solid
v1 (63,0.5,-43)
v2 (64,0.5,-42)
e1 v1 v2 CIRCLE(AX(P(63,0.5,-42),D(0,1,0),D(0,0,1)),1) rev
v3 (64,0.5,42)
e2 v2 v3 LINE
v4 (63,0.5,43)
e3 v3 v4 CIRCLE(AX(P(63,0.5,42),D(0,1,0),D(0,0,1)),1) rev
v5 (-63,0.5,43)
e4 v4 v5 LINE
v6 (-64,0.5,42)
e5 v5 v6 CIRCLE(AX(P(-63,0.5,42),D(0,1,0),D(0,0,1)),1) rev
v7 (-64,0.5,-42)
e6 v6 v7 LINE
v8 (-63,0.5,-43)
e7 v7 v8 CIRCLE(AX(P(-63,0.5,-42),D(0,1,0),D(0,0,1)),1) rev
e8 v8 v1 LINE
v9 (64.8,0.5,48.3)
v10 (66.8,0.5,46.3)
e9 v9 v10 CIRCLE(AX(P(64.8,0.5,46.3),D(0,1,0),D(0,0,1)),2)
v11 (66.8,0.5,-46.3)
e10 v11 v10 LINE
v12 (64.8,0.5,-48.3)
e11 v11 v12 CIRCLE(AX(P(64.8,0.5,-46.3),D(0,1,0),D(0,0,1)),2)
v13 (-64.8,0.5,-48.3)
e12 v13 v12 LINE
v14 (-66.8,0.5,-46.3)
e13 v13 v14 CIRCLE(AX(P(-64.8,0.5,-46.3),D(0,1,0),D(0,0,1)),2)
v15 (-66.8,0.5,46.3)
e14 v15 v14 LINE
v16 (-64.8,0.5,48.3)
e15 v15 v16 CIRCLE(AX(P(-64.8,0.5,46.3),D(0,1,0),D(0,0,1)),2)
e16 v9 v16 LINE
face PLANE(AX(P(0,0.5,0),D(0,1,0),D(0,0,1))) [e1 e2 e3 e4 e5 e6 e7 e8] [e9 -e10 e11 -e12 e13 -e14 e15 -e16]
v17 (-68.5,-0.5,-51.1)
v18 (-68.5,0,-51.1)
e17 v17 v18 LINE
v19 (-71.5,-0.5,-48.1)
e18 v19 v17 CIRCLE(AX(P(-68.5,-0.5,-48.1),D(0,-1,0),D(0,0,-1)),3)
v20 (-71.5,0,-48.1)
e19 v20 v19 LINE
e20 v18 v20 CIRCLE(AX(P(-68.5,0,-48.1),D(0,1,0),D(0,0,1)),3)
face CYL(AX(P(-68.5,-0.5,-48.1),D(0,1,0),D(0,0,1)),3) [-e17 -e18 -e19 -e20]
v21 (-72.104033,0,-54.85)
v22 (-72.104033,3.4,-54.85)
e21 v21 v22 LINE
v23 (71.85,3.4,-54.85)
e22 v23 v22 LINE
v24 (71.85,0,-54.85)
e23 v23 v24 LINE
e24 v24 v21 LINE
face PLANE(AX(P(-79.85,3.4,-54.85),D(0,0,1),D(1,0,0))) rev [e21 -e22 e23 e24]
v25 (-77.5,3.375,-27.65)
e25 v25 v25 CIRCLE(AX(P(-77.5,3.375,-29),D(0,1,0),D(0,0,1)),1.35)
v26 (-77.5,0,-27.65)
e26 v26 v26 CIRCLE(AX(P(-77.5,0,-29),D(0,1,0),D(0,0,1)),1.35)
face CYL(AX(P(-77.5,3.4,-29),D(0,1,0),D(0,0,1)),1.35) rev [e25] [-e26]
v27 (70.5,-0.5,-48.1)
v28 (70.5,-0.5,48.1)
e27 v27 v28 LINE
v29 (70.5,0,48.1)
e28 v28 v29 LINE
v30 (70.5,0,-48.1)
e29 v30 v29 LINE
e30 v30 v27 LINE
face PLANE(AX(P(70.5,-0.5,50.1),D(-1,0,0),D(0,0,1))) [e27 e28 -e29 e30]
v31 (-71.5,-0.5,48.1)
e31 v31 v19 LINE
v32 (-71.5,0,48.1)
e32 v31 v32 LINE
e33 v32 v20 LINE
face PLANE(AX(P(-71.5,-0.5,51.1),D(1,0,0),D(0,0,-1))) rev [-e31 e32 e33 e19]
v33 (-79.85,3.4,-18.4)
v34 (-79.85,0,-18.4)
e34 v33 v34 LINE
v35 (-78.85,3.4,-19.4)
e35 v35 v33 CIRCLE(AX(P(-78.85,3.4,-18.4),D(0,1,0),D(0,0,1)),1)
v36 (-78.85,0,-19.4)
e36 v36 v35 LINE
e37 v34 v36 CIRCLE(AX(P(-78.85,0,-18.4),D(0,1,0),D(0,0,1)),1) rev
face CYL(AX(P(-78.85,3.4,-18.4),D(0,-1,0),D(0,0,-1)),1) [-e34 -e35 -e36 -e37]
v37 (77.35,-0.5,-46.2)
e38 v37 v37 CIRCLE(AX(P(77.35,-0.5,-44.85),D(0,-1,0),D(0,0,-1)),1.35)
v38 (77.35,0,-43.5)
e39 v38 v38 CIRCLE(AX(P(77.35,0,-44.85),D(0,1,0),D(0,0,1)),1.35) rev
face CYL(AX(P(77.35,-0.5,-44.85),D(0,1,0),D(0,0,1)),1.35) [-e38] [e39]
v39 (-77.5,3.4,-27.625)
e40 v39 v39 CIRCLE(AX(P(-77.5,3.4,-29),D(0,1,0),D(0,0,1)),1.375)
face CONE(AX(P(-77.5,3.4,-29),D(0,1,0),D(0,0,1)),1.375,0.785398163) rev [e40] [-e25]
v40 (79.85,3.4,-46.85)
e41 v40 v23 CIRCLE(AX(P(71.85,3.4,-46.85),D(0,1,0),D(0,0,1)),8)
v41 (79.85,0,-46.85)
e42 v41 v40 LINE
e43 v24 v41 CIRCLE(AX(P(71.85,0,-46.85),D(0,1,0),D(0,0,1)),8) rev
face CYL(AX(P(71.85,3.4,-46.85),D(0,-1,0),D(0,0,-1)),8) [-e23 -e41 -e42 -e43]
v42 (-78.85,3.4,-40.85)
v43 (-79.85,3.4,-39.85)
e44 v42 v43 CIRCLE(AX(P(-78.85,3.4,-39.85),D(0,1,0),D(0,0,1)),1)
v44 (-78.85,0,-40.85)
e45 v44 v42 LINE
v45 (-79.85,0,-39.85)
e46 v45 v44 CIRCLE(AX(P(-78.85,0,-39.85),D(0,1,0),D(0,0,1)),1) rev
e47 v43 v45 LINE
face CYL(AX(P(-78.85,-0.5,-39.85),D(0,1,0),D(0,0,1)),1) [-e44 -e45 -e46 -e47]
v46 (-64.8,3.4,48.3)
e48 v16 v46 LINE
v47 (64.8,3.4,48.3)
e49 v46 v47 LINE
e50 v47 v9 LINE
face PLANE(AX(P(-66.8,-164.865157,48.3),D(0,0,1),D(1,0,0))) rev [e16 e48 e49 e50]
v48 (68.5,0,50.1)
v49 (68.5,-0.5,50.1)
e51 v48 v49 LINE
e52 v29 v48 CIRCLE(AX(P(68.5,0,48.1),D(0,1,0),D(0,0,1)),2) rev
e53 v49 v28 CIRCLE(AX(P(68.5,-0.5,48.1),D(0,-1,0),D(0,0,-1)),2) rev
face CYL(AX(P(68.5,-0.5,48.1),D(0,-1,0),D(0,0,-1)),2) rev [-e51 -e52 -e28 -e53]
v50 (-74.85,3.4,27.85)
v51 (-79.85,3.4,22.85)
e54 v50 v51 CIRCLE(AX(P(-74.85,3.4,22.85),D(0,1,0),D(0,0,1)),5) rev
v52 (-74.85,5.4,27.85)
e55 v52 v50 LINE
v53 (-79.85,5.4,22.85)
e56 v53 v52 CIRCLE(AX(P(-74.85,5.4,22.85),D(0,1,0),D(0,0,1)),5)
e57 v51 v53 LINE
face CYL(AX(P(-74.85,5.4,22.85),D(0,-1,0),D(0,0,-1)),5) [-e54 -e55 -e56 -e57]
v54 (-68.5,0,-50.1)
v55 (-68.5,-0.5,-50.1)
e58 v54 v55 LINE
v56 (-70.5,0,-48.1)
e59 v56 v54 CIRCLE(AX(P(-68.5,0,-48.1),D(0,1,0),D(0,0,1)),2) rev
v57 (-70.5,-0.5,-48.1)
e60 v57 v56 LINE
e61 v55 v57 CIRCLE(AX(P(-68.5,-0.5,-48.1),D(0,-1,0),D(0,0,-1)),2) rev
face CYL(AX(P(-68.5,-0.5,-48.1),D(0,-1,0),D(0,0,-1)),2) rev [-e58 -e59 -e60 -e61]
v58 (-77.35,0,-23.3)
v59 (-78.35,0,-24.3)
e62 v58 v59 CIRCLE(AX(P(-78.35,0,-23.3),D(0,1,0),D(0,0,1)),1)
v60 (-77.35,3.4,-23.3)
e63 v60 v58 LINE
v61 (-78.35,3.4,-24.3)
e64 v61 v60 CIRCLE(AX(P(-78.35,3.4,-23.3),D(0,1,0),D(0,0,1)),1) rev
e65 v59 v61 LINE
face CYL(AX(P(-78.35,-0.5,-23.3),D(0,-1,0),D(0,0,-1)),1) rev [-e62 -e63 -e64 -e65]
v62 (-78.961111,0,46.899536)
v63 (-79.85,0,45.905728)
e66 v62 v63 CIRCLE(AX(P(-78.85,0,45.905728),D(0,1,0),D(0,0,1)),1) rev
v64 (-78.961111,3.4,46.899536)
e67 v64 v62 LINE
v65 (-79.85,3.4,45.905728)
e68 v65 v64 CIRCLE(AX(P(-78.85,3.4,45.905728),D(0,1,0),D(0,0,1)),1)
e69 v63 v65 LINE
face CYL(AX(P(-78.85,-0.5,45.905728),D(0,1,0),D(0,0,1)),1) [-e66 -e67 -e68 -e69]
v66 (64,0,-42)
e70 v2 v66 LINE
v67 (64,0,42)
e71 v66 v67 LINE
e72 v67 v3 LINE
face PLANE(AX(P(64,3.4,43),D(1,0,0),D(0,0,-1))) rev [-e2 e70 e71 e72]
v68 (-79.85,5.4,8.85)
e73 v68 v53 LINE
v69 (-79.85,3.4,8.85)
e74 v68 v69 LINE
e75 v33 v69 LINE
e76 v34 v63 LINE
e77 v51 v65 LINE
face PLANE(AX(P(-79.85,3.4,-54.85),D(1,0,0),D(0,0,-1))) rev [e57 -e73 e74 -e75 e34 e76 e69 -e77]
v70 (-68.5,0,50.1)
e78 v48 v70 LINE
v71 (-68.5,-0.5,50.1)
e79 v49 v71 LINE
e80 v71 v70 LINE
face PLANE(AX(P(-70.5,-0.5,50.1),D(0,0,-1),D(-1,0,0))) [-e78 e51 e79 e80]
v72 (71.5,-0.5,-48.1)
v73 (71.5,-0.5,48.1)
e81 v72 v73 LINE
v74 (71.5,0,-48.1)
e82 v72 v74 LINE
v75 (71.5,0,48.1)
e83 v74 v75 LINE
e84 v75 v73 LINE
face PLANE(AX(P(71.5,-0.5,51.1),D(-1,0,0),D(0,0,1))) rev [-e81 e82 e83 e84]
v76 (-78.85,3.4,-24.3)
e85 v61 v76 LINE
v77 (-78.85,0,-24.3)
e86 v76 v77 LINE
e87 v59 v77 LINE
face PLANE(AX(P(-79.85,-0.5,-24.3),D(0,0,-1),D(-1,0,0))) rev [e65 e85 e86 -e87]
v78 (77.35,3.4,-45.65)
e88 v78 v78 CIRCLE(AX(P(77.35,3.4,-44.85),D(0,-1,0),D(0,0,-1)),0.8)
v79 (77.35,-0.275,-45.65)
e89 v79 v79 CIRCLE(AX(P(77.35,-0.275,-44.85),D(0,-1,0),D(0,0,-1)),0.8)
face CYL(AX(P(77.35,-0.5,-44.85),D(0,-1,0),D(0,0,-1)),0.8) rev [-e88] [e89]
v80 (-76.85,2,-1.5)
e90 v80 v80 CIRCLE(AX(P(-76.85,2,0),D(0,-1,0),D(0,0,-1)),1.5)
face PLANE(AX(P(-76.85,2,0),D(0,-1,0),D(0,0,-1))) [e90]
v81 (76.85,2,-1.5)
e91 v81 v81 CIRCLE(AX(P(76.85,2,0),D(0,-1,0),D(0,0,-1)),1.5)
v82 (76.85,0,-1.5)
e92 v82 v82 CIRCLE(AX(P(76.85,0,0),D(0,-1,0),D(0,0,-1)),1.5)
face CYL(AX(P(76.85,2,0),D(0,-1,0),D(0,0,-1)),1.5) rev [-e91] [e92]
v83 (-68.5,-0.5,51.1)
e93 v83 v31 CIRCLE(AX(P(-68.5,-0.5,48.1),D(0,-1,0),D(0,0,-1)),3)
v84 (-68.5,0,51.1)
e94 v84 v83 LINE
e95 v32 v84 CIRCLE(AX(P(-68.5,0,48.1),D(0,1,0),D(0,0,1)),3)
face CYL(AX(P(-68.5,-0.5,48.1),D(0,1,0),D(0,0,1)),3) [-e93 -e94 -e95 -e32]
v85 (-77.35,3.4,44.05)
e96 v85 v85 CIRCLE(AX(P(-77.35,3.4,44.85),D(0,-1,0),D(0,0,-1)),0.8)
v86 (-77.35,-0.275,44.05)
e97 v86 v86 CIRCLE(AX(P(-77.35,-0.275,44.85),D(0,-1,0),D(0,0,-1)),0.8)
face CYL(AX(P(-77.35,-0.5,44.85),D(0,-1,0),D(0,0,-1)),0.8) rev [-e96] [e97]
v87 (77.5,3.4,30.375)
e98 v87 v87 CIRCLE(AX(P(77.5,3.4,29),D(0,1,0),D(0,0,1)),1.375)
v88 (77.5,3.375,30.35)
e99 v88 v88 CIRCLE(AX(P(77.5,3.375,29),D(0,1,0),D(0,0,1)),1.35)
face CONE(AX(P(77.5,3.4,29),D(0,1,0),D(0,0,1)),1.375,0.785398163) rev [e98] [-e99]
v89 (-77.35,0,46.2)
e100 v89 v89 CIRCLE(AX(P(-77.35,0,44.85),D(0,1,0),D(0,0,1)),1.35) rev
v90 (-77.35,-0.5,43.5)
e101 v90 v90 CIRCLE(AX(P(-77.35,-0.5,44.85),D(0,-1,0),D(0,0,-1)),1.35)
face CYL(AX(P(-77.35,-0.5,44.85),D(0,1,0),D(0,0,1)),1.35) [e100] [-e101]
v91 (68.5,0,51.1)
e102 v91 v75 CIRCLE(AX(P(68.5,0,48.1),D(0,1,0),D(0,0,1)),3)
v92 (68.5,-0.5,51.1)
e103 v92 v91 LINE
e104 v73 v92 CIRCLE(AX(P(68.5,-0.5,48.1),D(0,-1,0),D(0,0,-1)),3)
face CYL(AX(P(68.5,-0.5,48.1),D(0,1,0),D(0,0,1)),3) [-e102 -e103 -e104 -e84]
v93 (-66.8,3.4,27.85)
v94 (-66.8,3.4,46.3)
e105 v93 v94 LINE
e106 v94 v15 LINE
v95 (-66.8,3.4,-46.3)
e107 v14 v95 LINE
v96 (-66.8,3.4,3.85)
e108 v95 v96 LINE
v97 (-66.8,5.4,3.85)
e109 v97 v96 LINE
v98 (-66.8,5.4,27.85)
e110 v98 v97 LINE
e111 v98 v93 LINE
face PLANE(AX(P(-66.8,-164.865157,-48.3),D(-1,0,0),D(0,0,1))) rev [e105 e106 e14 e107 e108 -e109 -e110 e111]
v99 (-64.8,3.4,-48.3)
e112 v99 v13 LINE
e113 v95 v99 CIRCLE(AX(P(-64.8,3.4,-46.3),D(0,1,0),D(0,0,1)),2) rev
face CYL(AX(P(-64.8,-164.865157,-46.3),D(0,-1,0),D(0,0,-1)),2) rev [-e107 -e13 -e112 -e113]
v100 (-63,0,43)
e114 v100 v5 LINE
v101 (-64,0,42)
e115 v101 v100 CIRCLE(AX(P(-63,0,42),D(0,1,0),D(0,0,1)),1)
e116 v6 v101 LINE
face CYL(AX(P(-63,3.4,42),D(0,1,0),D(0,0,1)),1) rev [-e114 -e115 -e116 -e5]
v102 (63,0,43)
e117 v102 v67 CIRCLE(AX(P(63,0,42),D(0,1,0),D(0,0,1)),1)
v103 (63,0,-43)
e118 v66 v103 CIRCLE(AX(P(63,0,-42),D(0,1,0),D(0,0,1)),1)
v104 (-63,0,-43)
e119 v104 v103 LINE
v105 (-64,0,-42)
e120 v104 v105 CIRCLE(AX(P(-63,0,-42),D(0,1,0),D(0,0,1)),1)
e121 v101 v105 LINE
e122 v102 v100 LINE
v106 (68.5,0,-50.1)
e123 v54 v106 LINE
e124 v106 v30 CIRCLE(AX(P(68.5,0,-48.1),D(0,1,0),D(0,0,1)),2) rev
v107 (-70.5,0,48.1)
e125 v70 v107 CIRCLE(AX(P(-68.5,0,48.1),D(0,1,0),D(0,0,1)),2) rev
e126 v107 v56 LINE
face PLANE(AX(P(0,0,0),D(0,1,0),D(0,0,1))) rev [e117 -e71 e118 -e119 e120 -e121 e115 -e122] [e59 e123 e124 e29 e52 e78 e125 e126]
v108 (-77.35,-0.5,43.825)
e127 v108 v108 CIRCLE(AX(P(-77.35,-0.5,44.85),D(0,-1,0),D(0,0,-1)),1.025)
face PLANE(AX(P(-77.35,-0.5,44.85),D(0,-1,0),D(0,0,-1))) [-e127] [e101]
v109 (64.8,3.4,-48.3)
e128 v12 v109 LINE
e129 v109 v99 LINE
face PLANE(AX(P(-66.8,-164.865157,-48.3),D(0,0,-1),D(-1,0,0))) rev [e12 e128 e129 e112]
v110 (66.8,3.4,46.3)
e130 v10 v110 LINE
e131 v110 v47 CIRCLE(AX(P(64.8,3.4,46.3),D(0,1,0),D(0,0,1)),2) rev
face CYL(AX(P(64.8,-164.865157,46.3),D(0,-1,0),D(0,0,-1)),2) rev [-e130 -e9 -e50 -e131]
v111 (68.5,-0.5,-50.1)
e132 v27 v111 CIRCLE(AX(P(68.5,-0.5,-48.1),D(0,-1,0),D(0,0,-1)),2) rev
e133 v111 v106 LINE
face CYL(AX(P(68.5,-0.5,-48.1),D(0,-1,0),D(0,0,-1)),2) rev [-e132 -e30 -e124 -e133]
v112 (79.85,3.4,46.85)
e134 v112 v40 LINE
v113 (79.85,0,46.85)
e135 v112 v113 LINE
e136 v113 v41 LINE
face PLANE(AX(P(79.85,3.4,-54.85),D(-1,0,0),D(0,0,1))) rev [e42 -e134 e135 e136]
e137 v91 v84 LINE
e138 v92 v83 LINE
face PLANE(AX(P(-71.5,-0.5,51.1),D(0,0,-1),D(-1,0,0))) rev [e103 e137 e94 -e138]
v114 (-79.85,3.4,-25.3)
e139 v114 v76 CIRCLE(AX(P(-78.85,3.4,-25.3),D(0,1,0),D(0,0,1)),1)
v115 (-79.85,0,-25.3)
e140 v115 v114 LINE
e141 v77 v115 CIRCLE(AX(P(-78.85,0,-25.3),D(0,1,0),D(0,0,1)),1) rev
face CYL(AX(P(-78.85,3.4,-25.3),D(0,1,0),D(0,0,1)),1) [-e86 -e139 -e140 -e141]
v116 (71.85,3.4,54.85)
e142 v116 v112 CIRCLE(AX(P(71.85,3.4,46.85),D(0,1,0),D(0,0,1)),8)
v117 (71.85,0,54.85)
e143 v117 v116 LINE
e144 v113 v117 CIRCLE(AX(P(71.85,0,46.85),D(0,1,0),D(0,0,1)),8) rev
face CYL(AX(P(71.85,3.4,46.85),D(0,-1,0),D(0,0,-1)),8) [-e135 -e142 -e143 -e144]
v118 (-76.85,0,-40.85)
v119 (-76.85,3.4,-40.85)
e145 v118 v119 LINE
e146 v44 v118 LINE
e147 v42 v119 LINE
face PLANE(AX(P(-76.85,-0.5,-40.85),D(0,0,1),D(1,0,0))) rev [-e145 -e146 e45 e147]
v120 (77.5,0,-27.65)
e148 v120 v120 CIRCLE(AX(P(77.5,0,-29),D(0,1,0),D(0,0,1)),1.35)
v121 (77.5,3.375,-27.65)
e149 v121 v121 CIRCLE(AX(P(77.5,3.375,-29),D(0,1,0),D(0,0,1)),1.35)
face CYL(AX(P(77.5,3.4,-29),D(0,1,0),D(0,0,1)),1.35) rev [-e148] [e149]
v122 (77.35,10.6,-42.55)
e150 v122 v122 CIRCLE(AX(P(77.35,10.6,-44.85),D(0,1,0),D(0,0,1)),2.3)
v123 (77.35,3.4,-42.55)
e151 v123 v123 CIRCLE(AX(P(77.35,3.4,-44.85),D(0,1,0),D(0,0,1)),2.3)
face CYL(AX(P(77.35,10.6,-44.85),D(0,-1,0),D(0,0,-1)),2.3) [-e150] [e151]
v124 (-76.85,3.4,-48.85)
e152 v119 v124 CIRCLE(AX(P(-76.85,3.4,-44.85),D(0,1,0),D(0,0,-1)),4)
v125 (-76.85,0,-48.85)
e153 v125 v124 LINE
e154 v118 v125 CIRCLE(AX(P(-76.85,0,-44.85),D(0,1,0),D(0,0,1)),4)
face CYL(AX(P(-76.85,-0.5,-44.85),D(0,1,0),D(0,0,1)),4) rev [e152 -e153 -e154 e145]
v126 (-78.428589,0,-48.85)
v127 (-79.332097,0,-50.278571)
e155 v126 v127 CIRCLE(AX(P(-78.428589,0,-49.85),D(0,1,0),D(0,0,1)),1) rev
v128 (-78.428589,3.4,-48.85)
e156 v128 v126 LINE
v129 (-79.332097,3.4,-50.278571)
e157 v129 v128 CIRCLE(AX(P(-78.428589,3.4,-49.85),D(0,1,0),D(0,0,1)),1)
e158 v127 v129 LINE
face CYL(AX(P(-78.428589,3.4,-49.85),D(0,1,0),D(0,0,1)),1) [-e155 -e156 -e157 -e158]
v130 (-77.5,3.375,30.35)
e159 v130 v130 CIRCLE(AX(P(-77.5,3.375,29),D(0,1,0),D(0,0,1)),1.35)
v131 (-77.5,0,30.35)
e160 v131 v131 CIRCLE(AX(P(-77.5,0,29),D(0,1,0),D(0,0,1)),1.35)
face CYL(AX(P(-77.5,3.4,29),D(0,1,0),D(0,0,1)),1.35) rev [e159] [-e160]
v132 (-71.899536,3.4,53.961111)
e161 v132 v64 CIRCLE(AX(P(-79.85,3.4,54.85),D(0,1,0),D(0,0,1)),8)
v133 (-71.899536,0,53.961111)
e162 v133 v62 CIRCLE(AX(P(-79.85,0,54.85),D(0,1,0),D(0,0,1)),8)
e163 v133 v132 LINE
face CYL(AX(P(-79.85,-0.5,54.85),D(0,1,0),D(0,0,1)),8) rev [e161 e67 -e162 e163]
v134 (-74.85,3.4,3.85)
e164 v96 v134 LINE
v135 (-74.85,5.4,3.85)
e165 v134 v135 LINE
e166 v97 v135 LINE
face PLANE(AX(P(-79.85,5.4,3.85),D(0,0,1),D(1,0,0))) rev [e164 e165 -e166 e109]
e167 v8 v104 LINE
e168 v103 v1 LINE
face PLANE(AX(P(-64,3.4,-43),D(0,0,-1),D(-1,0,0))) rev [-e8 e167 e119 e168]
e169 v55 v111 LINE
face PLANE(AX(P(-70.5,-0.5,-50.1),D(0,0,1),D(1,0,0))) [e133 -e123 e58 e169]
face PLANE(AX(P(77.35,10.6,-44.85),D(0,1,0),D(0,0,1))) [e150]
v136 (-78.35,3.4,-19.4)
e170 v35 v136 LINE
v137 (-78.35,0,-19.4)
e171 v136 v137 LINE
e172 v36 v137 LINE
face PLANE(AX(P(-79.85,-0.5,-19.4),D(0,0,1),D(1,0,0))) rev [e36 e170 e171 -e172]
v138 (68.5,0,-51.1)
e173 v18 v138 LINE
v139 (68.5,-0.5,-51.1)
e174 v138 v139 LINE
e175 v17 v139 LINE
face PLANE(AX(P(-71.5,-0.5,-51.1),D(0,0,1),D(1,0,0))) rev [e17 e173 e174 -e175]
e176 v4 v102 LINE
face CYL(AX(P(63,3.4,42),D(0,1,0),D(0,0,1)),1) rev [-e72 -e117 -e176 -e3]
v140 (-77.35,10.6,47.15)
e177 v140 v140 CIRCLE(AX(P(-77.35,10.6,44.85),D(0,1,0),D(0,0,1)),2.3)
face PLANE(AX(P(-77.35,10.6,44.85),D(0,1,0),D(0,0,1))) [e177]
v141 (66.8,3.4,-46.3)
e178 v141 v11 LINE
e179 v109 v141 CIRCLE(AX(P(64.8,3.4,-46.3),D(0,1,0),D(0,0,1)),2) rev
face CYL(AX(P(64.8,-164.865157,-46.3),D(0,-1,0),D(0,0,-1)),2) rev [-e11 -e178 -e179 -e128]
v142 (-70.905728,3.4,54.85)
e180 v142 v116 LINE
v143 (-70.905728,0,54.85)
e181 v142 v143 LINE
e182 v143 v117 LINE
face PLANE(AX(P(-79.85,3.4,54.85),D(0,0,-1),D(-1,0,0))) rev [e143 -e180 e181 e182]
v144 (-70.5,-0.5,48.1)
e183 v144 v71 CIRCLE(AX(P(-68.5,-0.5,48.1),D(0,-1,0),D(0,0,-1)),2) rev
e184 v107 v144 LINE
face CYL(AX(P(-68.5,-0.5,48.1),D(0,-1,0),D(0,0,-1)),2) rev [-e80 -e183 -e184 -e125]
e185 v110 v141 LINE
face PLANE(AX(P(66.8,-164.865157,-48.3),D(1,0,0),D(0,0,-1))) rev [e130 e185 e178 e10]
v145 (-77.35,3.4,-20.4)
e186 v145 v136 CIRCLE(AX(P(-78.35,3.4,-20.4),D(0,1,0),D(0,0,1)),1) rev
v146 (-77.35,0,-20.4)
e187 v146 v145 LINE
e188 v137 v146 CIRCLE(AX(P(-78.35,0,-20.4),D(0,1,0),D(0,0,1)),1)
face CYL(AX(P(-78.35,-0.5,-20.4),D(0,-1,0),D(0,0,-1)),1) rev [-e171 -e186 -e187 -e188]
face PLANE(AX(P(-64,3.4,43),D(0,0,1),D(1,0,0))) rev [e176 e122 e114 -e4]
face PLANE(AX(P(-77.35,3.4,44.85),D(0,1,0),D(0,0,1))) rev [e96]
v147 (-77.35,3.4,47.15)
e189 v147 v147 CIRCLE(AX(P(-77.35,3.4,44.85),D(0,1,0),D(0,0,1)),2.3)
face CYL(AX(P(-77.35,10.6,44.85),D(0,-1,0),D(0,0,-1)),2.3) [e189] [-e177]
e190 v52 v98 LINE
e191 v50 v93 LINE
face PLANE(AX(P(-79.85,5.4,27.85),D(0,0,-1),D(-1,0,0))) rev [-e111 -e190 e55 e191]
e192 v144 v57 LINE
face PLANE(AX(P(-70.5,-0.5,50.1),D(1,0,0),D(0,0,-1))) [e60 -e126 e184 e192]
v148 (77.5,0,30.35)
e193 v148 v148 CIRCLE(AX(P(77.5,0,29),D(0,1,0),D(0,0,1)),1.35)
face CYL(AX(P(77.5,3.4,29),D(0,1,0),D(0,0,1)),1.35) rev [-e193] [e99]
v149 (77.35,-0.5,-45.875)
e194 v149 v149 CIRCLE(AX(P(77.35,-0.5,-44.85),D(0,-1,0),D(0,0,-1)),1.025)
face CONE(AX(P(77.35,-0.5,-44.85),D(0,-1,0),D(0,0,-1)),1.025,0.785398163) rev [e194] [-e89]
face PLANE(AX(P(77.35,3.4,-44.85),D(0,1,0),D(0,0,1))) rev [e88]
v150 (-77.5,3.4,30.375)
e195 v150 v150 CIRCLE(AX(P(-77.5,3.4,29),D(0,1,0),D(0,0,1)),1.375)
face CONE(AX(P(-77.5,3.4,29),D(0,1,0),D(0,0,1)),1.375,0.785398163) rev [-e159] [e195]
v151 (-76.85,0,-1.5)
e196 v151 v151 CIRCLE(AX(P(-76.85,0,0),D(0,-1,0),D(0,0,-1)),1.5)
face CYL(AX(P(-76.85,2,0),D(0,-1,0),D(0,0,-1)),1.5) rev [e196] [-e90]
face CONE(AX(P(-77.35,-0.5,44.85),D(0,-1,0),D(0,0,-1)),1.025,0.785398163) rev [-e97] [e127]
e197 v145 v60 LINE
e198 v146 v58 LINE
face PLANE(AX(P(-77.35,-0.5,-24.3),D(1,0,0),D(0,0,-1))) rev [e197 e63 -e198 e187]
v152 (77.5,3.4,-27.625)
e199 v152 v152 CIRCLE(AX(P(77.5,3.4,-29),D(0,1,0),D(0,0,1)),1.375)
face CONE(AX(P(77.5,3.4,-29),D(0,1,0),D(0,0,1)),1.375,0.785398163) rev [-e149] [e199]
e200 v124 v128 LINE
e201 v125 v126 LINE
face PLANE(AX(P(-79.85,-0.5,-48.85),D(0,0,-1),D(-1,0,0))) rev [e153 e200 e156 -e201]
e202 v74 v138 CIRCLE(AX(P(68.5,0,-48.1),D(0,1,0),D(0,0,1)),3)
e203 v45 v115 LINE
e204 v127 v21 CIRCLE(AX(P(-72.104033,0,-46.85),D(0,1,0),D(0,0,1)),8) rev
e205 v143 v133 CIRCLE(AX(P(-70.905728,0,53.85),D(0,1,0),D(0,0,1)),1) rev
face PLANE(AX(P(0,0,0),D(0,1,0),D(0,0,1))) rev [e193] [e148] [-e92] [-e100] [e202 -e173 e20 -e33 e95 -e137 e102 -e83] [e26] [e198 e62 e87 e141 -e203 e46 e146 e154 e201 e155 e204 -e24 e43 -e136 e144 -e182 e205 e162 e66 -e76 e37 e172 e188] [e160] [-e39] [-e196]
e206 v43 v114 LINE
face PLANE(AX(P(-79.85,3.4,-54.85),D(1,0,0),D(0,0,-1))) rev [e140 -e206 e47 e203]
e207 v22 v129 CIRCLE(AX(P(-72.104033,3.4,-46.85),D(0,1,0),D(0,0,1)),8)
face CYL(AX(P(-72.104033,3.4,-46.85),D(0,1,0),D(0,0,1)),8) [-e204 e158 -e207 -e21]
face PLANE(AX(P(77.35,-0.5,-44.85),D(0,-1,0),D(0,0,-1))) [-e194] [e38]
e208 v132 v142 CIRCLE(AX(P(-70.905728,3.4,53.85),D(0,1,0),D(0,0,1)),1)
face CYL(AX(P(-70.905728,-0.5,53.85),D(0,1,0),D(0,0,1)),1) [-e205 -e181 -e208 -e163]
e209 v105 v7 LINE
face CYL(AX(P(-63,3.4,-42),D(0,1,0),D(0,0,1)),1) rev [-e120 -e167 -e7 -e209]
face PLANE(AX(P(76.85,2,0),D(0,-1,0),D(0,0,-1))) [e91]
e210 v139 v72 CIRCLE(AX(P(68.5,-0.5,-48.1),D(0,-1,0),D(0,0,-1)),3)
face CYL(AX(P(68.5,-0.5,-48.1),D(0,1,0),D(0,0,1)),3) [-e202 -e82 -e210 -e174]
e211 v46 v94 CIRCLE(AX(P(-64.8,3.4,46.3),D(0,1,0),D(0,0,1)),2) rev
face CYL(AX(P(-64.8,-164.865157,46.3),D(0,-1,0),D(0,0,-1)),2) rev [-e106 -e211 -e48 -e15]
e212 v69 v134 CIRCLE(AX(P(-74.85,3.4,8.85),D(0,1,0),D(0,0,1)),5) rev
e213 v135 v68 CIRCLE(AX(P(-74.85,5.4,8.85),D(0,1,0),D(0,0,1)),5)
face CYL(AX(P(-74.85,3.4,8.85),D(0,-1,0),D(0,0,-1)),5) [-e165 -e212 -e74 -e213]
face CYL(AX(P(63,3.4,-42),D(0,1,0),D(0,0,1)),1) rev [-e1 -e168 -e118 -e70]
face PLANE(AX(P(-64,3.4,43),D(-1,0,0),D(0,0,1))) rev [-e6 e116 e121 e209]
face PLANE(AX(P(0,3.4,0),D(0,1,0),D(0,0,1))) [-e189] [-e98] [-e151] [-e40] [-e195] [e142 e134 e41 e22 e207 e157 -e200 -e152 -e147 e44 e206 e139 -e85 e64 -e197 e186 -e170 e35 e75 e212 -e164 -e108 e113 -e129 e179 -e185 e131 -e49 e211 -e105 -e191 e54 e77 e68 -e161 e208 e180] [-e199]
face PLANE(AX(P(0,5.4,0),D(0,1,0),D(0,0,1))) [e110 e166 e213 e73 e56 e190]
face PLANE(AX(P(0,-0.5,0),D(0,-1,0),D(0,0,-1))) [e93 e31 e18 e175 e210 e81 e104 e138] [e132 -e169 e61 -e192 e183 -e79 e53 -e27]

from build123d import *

# Parameters (mm, degrees)
SKETCH1_W                            = 159.7
SKETCH1_H                            = 109.7
BOSS_EXTRUDE1_DEPTH                  = 3.4
SKETCH5_W                            = 128
SKETCH5_H                            = 86
CUT_EXTRUDE1_DEPTH                   = 97.933508138
SKETCH6_W                            = 133.6
SKETCH6_H                            = 96.6
CUT_EXTRUDE2_DEPTH                   = 2.9
F_2_7_2_7_DIAMETER_HOLE1_D           = 2.7
F_2_7_2_7_DIAMETER_HOLE1_CSINK_D     = 2.75
F_2_7_2_7_DIAMETER_HOLE1_CSINK_ANGLE = 90
SKETCH10_R                           = 1.35
BOSS_EXTRUDE3_DEPTH                  = 0.5
M2X0_4_TAPPED_HOLE1_D                = 1.6
M2X0_4_TAPPED_HOLE1_CSINK_D          = 2.05
M2X0_4_TAPPED_HOLE1_CSINK_ANGLE      = 90
SKETCH7_W                            = 143
SKETCH7_H                            = 102.2
SKETCH7_W_2                          = 141
SKETCH7_H_2                          = 100.2
BOSS_EXTRUDE2_DEPTH                  = 0.5
SKETCH17_R                           = 1.5
CUT_EXTRUDE6_DEPTH                   = 2
SKETCH15_W                           = 2.5
SKETCH15_H                           = 4.9
CUT_EXTRUDE5_DEPTH                   = 97.952333649
CUT_EXTRUDE4_DEPTH                   = 97.952333649
SKETCH8_R                            = 8
CUT_EXTRUDE3_DEPTH                   = 97.952333649
SKETCH14_R                           = 2.3
BOSS_EXTRUDE4_DEPTH                  = 7.2
FILLET1_R                            = 8
FILLET2_R                            = 2
FILLET3_R                            = 3
FILLET4_R                            = 1
FILLET5_R                            = 2
FILLET6_R                            = 1
SKETCH16_W                           = 13.05
SKETCH16_H                           = 24
BOSS_EXTRUDE5_DEPTH                  = 2
FILLET7_R                            = 5


with BuildPart() as part:
    # Sketch1 → Boss-Extrude1 (new body)
    with BuildSketch(Plane(origin=(0, 0, 0), x_dir=(1, 0, 0), z_dir=(0, 1, 0))):
        Rectangle(SKETCH1_W, SKETCH1_H)
    extrude(amount=BOSS_EXTRUDE1_DEPTH)

    # Sketch5 → Cut-Extrude1 (cut, through all)
    with BuildSketch(Plane.XZ):
        Rectangle(SKETCH5_W, SKETCH5_H)
    extrude(amount=-CUT_EXTRUDE1_DEPTH, mode=Mode.SUBTRACT)

    # Sketch6 → Cut-Extrude2 (cut)
    with BuildSketch(Plane(origin=(0, 3.4, 0), x_dir=(1, 0, 0), z_dir=(0, 1, 0))):
        Rectangle(SKETCH6_W, SKETCH6_H)
    extrude(amount=-CUT_EXTRUDE2_DEPTH, mode=Mode.SUBTRACT)

    # Ø2.7 (2.7) Diameter Hole1 (through all)
    with Locations(Plane(origin=(0, 3.4, 0), x_dir=(1, 0, 0), z_dir=(0, 1, 0))):
        with Locations((-77.5, 29), (-77.5, -29), (77.5, 29), (77.5, -29)):
            CounterSinkHole(F_2_7_2_7_DIAMETER_HOLE1_D / 2, F_2_7_2_7_DIAMETER_HOLE1_CSINK_D / 2, counter_sink_angle=F_2_7_2_7_DIAMETER_HOLE1_CSINK_ANGLE)

    # Sketch10 → Boss-Extrude3 (add)
    with BuildSketch(Plane.XZ):
        with Locations(Location((-77.35, 44.85, 0), (0, 0, 90))):
            Circle(SKETCH10_R)
        with Locations(Location((77.35, -44.85, 0), (0, 0, 90))):
            Circle(SKETCH10_R)
    extrude(amount=BOSS_EXTRUDE3_DEPTH)

    # M2x0.4 Tapped Hole1 (through all)
    with Locations(Plane(origin=(0, -0.5, 0), x_dir=(-1, 0, 0), z_dir=(0, -1, 0))):
        with Locations((-77.35, 44.85), (77.35, -44.85)):
            CounterSinkHole(M2X0_4_TAPPED_HOLE1_D / 2, M2X0_4_TAPPED_HOLE1_CSINK_D / 2, counter_sink_angle=M2X0_4_TAPPED_HOLE1_CSINK_ANGLE)

    # Sketch7 → Boss-Extrude2 (add)
    with BuildSketch(Plane.XZ):
        Rectangle(SKETCH7_W, SKETCH7_H)
        Rectangle(SKETCH7_W_2, SKETCH7_H_2, mode=Mode.SUBTRACT)
    extrude(amount=BOSS_EXTRUDE2_DEPTH)

    # Sketch17 → Cut-Extrude6 (cut)
    with BuildSketch(Plane.XZ):
        with Locations(Location((-76.85, 0, 0), (0, 0, 270))):
            Circle(SKETCH17_R)
        with Locations(Location((76.85, 0, 0), (0, 0, 270))):
            Circle(SKETCH17_R)
    extrude(amount=-CUT_EXTRUDE6_DEPTH, mode=Mode.SUBTRACT)

    # Sketch15 → Cut-Extrude5 (cut, through all)
    with BuildSketch(Plane(origin=(0, 3.4, 0), x_dir=(1, 0, 0), z_dir=(0, 1, 0))):
        with Locations((-78.6, 21.85)):
            Rectangle(SKETCH15_W, SKETCH15_H)
    extrude(amount=-CUT_EXTRUDE5_DEPTH, mode=Mode.SUBTRACT)

    # Sketch9 → Cut-Extrude4 (cut, through all)
    with BuildSketch(Plane(origin=(0, 3.4, 0), x_dir=(1, 0, 0), z_dir=(0, 1, 0))):
        with BuildLine():
            Line((-76.85, 40.85), (-79.85, 40.85))
            Line((-79.85, 40.85), (-79.85, 48.85))
            Line((-79.85, 48.85), (-76.85, 48.85))
            ThreePointArc((-76.85, 48.85), (-72.85, 44.85), (-76.85, 40.85))
        make_face()
    extrude(amount=-CUT_EXTRUDE4_DEPTH, mode=Mode.SUBTRACT)

    # Sketch8 → Cut-Extrude3 (cut, through all)
    with BuildSketch(Plane(origin=(0, 3.4, 0), x_dir=(1, 0, 0), z_dir=(0, 1, 0))):
        with Locations((-79.85, -54.85)):
            Circle(SKETCH8_R)
    extrude(amount=-CUT_EXTRUDE3_DEPTH, mode=Mode.SUBTRACT)

    # Sketch14 → Boss-Extrude4 (add)
    with BuildSketch(Plane(origin=(0, 3.4, 0), x_dir=(1, 0, 0), z_dir=(0, 1, 0))):
        with Locations(Location((-77.35, -44.85, 0), (0, 0, 270))):
            Circle(SKETCH14_R)
        with Locations(Location((77.35, 44.85, 0), (0, 0, 270))):
            Circle(SKETCH14_R)
    extrude(amount=BOSS_EXTRUDE4_DEPTH)

    # Fillet1
    # the kernel refuses this fillet: 8 mm, written as the material it takes off along each edge
    with BuildSketch(Plane(origin=(79.85, -20, 54.85), x_dir=(0, 0, -1), z_dir=(0, 1, 0)), Plane(origin=(79.85, -20, -54.85), x_dir=(-1, 0, 0), z_dir=(0, 1, 0))) as fillet1_piece_1:
        with BuildLine():
            CenterArc((FILLET1_R, FILLET1_R), FILLET1_R, 180, 90)
            Line((0, FILLET1_R), (-FILLET1_R * 0.02, FILLET1_R))
            Line((-FILLET1_R * 0.02, FILLET1_R), (-FILLET1_R * 0.02, -FILLET1_R * 0.02))
            Line((-FILLET1_R * 0.02, -FILLET1_R * 0.02), (FILLET1_R, -FILLET1_R * 0.02))
            Line((FILLET1_R, -FILLET1_R * 0.02), (FILLET1_R, 0))
        make_face()
    extrude(amount=43.4, mode=Mode.SUBTRACT)
    with BuildSketch(Plane(origin=(-79.85, -19.364916731, -54.85), x_dir=(1, 0, 0), z_dir=(0, 1, 0))) as fillet1_piece_2:
        with BuildLine():
            CenterArc((7.745966692, -8), FILLET1_R, 90, 75.522487814)
            Line((0, -6), (-0.154919334, -5.96))
            ThreePointArc((-0.154919334, -5.96), (-0.16, -3), (-0.16, 0))
            Line((-0.16, 0), (0, 0.16))
            Line((0, 0.16), (7.745966692, 0.16))
            Line((7.745966692, 0.16), (7.745966692, 0))
        make_face()
    extrude(amount=42.129833462, mode=Mode.SUBTRACT)

    # Fillet2
    fillet2_edges = [part.edges().sort_by_distance(p)[0] for p in [
        (70.5, -0.25, 50.1),
        (-70.5, -0.25, 50.1),
        (-70.5, -0.25, -50.1),
        (70.5, -0.25, -50.1),
    ]]
    fillet(fillet2_edges, radius=FILLET2_R)

    # Fillet3
    fillet3_edges = [part.edges().sort_by_distance(p)[0] for p in [
        (71.5, -0.25, -51.1),
        (71.5, -0.25, 51.1),
        (-71.5, -0.25, 51.1),
        (-71.5, -0.25, -51.1),
    ]]
    fillet(fillet3_edges, radius=FILLET3_R)

    # Fillet4
    fillet4_edges = [part.edges().sort_by_distance(p)[0] for p in [
        (-64, 0.25, 43),
        (64, 0.25, 43),
        (-64, 0.25, -43),
        (64, 0.25, -43),
    ]]
    fillet(fillet4_edges, radius=FILLET4_R)

    # Fillet5
    fillet5_edges = [part.edges().sort_by_distance(p)[0] for p in [
        (66.8, 1.95, -48.3),
        (66.8, 1.95, 48.3),
        (-66.8, 1.95, 48.3),
        (-66.8, 1.95, -48.3),
    ]]
    fillet(fillet5_edges, radius=FILLET5_R)

    # Fillet6
    fillet6_edges = [part.edges().sort_by_distance(p)[0] for p in [
        (-79.85, 1.7, -19.4),
        (-79.85, 1.7, -24.3),
        (-77.35, 1.7, -24.3),
        (-77.35, 1.7, -19.4),
        (-79.85, 1.7, -40.85),
        (-79.85, 1.7, -48.85),
        (-71.85, 1.7, 54.85),
        (-79.85, 1.7, 46.85),
    ]]
    fillet(fillet6_edges, radius=FILLET6_R)

    # Sketch16 → Boss-Extrude5 (add)
    with BuildSketch(Plane(origin=(0, 3.4, 0), x_dir=(1, 0, 0), z_dir=(0, 1, 0))):
        with Locations((-73.325, -15.85)):
            Rectangle(SKETCH16_W, SKETCH16_H)
    extrude(amount=BOSS_EXTRUDE5_DEPTH)

    # Fillet7
    # the kernel refuses this fillet: 5 mm, written as the material it takes off along each edge
    with BuildSketch(Plane(origin=(-79.85, 3.4, 3.85), x_dir=(0, 0, 1), z_dir=(0, 1, 0))) as fillet7_piece_1:
        with BuildLine():
            CenterArc((FILLET7_R, FILLET7_R), FILLET7_R, 180, 90)
            Line((0, FILLET7_R), (0, 0))
            Line((0, 0), (FILLET7_R, 0))
        make_face()
    extrude(amount=14.5, mode=Mode.SUBTRACT)
    with BuildSketch(Plane(origin=(-79.85, 3.4, 27.85), x_dir=(0, 0, -1), z_dir=(0, 1, 0))) as fillet7_piece_2:
        with BuildLine():
            CenterArc((FILLET7_R, -FILLET7_R), FILLET7_R, 90, 90)
            Line((0, -FILLET7_R), (0, 0))
            Line((0, 0), (FILLET7_R, 0))
        make_face()
    extrude(amount=14.5, mode=Mode.SUBTRACT)


solid = part.part
